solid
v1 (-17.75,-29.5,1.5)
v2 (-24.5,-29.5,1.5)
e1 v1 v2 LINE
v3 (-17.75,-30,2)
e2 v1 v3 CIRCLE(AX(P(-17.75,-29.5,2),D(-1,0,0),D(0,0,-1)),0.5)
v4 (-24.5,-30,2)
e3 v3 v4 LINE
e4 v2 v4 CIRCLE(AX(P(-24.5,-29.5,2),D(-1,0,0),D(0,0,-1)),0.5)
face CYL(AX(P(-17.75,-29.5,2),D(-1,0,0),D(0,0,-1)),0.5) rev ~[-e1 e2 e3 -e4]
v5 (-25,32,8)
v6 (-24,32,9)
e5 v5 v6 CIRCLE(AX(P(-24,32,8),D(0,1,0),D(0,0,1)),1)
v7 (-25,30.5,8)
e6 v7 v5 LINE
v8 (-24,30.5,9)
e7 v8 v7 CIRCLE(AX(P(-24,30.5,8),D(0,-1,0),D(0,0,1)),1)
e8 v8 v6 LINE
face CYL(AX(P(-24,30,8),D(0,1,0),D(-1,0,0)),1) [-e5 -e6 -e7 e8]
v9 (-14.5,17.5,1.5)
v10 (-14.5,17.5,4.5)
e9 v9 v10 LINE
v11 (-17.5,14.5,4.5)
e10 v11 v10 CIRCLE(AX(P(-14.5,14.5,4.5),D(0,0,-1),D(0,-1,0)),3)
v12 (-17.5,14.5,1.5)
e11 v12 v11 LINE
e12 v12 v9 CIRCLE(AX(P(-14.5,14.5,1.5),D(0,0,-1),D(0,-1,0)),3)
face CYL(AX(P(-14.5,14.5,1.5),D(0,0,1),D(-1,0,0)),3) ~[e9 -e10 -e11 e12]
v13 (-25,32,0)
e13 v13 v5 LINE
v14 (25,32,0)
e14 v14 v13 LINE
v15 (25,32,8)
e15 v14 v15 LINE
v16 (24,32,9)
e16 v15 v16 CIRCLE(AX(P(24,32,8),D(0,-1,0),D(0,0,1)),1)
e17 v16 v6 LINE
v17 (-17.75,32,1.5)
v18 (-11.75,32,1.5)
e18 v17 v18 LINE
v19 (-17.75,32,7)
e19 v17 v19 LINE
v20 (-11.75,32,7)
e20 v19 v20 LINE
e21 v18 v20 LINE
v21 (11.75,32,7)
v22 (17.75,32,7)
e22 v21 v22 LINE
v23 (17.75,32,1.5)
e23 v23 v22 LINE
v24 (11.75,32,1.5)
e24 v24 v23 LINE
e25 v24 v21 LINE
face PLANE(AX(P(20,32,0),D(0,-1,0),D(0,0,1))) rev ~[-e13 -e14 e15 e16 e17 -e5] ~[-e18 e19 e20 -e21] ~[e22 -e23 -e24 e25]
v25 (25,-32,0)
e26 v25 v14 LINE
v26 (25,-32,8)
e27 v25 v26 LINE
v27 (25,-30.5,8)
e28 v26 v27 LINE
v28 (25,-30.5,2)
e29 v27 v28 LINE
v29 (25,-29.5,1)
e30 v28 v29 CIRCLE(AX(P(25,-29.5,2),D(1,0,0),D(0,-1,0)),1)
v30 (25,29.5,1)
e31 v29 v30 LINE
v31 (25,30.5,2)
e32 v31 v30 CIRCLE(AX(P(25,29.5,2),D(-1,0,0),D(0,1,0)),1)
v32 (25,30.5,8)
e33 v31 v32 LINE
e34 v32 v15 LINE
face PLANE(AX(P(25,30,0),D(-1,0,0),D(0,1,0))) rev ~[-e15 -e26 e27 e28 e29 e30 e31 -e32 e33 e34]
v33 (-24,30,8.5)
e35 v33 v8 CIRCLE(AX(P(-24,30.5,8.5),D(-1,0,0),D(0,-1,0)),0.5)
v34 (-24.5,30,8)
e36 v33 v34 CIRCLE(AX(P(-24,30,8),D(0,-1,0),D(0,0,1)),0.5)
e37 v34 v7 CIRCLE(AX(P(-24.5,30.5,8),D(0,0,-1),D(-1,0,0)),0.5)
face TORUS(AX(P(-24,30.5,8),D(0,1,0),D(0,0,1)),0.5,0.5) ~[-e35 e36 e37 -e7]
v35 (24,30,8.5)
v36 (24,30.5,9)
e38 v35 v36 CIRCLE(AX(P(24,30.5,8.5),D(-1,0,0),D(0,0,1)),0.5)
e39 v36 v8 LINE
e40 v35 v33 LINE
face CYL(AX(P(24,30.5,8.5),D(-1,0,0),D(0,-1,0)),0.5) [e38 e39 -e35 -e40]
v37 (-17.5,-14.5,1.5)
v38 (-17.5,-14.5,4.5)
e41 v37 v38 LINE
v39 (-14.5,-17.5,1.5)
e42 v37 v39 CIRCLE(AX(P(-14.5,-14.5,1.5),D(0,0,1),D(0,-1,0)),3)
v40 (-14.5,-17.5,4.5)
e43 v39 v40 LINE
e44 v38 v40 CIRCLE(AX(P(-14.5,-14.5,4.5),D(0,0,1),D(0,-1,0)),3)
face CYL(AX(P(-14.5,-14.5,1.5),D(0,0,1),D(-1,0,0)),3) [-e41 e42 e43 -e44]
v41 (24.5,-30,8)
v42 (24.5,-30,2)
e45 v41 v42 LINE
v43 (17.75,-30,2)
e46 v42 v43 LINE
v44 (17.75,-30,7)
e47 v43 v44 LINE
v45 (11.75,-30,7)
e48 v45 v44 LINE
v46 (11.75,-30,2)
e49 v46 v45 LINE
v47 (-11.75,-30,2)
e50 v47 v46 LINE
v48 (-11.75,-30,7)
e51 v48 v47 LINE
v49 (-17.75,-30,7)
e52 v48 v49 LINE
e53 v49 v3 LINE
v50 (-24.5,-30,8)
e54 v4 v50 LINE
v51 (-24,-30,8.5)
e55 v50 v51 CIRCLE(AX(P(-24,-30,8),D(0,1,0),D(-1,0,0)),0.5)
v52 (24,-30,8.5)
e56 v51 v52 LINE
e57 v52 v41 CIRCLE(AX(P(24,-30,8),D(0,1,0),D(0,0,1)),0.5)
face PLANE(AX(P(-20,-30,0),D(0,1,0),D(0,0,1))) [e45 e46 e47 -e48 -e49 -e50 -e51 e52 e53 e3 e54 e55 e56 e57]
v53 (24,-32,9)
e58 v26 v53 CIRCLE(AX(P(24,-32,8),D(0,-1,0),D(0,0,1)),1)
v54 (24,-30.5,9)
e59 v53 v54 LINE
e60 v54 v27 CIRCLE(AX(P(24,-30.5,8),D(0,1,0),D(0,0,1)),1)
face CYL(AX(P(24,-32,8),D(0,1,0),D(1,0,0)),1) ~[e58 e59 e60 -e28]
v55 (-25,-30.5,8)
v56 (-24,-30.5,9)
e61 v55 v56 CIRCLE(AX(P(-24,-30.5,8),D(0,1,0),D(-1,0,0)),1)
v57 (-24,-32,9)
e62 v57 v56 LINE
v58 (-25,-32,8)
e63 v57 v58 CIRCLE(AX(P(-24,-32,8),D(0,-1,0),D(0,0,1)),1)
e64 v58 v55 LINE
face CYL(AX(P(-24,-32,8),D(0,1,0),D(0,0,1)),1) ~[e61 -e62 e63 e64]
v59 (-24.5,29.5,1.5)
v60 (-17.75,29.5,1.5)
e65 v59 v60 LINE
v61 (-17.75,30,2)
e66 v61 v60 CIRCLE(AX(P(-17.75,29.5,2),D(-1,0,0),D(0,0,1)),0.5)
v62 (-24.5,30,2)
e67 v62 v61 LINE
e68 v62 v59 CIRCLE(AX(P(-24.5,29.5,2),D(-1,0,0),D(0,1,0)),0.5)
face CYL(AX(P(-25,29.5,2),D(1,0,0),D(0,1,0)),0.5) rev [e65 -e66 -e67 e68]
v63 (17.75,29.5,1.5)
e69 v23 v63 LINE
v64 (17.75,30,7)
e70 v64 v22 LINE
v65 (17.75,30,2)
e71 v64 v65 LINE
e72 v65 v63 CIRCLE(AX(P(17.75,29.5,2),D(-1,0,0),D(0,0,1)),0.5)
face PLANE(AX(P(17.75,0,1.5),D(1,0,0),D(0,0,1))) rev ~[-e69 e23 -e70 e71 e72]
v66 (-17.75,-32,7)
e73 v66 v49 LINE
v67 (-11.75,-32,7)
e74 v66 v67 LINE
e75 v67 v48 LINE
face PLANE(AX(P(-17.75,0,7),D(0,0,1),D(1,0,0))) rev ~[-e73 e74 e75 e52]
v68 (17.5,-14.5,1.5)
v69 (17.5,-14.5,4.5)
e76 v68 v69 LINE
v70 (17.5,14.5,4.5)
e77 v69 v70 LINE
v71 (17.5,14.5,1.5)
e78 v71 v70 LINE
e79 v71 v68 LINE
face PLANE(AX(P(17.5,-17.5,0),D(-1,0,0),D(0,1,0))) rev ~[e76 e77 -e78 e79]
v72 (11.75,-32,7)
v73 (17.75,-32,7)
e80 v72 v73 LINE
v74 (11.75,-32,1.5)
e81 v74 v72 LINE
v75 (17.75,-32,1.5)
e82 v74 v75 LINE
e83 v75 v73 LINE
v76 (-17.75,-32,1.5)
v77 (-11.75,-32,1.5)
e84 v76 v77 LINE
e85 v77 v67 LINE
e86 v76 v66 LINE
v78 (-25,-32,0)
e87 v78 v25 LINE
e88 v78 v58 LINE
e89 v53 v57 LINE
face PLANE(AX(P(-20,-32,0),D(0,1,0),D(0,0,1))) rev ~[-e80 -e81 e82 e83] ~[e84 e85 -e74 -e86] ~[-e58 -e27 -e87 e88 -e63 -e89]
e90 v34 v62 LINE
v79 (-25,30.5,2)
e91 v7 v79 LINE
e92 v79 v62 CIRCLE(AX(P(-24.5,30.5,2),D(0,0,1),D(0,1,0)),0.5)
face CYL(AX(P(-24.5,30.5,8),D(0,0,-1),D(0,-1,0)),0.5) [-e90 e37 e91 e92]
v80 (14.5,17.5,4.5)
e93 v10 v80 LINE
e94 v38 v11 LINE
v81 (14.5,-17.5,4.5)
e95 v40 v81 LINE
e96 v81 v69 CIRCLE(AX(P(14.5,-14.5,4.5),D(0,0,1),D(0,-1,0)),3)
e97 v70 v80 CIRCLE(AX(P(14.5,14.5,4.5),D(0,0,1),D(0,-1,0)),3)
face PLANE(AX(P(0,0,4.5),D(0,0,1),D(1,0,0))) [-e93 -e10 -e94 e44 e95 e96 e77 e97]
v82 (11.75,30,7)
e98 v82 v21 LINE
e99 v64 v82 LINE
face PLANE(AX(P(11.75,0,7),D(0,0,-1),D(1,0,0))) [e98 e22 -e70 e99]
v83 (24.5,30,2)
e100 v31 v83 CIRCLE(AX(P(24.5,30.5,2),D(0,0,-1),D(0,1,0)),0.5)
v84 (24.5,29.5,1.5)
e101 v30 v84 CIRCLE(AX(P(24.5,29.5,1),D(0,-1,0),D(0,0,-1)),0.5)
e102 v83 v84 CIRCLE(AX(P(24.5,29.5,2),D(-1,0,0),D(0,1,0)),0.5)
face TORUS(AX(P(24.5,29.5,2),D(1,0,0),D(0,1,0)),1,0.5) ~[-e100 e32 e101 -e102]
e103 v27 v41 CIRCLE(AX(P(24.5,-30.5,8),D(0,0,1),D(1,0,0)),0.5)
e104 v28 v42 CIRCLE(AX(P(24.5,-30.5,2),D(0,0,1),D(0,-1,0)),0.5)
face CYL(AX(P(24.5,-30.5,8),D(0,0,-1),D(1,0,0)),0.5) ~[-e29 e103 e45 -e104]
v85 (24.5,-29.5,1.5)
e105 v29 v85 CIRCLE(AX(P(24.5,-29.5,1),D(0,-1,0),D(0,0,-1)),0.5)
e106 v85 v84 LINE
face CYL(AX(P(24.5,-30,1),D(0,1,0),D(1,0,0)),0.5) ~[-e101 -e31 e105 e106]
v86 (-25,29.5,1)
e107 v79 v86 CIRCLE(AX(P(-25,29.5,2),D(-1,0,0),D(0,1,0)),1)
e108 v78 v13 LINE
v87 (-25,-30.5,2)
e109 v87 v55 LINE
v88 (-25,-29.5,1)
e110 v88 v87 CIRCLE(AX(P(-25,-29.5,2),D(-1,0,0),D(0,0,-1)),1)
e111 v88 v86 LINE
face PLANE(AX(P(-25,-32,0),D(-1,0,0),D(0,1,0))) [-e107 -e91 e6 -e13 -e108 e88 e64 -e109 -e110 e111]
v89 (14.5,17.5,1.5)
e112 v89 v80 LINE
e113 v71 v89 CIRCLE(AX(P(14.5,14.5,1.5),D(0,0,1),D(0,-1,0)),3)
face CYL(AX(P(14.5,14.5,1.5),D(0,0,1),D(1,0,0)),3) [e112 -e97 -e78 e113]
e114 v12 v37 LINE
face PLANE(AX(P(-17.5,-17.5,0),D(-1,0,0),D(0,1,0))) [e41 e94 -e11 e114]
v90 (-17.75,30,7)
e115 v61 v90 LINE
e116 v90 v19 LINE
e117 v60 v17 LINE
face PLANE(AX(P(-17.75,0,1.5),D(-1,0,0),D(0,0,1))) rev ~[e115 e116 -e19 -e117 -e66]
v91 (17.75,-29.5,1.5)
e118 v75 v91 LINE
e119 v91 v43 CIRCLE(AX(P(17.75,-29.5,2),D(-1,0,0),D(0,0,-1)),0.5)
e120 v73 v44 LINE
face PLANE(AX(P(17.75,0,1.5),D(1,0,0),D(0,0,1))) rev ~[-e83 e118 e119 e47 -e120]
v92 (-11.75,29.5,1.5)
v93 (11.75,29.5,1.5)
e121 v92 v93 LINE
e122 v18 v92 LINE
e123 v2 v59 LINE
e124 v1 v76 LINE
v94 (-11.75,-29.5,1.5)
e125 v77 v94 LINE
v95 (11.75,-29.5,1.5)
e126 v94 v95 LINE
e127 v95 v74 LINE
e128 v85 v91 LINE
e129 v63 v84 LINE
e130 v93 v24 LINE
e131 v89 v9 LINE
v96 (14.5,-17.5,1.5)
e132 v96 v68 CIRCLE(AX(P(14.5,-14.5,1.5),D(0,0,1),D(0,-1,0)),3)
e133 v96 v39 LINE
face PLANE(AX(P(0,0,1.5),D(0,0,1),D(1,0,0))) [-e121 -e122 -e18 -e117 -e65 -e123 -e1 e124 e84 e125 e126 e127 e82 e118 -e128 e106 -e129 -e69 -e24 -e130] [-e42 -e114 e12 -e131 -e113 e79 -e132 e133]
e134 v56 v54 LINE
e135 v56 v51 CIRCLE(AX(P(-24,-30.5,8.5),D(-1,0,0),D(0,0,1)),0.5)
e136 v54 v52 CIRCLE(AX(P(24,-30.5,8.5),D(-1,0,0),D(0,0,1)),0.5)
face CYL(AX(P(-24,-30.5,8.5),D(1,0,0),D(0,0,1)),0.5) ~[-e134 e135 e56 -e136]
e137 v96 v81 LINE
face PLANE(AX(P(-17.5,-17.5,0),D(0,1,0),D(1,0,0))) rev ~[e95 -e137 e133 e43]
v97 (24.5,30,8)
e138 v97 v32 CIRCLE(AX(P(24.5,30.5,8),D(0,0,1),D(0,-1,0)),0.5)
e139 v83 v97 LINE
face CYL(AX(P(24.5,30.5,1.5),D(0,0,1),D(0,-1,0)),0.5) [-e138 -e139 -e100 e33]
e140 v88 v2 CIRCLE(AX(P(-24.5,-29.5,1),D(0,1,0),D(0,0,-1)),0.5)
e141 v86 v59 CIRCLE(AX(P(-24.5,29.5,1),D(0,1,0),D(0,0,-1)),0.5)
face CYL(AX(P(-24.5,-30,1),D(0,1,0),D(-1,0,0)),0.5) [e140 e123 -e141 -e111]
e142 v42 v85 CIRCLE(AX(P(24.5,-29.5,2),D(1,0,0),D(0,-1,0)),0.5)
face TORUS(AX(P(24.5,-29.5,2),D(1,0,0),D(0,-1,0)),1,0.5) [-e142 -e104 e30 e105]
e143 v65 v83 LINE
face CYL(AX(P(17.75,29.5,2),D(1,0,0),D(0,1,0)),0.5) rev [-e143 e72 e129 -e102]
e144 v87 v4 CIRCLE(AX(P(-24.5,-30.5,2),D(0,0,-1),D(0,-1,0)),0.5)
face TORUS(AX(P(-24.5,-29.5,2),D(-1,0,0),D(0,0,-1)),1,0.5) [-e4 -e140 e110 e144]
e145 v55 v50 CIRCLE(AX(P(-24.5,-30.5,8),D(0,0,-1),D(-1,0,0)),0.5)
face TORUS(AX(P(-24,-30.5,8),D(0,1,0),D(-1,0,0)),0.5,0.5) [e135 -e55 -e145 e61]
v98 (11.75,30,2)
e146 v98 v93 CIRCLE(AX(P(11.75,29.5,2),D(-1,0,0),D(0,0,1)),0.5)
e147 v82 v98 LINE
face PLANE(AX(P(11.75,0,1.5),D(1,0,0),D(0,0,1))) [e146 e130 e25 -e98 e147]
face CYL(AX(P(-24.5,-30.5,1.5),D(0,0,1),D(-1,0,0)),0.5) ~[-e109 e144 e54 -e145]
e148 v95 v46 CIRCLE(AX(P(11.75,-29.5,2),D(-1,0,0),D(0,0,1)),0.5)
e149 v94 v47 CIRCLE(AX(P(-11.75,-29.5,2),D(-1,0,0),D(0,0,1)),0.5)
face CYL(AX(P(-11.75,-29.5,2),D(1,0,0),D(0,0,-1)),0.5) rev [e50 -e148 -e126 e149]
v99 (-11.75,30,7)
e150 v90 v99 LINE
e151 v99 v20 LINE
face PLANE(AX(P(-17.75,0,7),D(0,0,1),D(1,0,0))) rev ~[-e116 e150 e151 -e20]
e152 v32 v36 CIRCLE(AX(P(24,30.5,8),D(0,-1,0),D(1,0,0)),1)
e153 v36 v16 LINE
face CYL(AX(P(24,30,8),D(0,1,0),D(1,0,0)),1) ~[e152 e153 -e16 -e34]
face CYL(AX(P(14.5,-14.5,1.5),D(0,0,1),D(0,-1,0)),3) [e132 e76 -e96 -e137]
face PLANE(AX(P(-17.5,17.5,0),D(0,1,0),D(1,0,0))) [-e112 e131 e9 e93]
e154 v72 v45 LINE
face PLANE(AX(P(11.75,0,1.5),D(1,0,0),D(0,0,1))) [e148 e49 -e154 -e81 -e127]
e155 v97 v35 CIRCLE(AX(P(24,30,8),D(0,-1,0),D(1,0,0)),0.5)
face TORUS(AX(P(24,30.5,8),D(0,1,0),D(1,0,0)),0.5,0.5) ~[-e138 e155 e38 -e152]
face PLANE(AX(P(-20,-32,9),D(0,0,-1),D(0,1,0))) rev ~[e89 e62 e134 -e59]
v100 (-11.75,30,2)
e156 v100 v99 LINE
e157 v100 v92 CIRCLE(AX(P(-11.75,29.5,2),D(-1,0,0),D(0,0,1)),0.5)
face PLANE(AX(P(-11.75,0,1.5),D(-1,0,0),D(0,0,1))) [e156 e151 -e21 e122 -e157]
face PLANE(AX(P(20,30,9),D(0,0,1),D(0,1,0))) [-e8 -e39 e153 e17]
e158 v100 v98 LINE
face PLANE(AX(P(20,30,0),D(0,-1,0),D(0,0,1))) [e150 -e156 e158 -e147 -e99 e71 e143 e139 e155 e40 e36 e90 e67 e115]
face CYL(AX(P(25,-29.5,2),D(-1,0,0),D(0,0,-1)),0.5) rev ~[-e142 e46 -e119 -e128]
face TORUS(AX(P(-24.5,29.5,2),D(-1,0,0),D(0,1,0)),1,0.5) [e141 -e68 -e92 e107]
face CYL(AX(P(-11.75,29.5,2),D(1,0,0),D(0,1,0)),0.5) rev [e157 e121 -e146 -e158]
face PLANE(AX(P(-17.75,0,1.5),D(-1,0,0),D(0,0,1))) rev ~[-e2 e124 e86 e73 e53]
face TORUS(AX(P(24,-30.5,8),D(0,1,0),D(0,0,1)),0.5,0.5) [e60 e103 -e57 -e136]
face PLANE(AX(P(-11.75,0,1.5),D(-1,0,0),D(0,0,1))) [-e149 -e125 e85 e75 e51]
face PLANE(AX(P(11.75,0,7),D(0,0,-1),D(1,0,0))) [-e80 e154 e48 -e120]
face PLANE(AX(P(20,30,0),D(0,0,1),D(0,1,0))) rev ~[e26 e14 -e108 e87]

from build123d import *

# Parameters (mm, degrees)
F0_W      = 50
F0_H      = 60
F1_DEPTH  = 1.5
F2_W      = 20
F2_H      = 2
F3_DEPTH  = 9
F4_W      = 6
F4_H      = 5.5
F5_DEPTH  = 32
F6_W      = 35
F6_H      = 35
F7_DEPTH  = 4.5
F8_R      = 3
F9_DEPTH  = 5
F10_DEPTH = 5
F11_DEPTH = 5
F12_DEPTH = 5
F13_R     = 1
F14_R     = 0.5


with BuildPart() as f1:
    # F0 (on Top) → F1 (new body)
    with BuildSketch(Plane.XY):
        Rectangle(F0_W, F0_H)
    extrude(amount=F1_DEPTH)

    # F2 (on Top) → F3 (join)
    with BuildSketch(Plane.XY):
        with Locations((10, 31)):
            Rectangle(F2_W, F2_H)
        with Locations((-10, 31)):
            Rectangle(F2_W, F2_H)
        with Locations((-10, -31)):
            Rectangle(F2_W, F2_H)
        with Locations((10, -31)):
            Rectangle(F2_W, F2_H)
    extrude(amount=F3_DEPTH)

    # F4 (on Front) → F5 (cut, symmetric)
    with BuildSketch(Plane.XZ):
        with Locations((-14.75, 4.25)):
            Rectangle(F4_W, F4_H)
        with Locations((14.75, 4.25)):
            Rectangle(F4_W, F4_H)
    extrude(amount=F5_DEPTH, both=True, mode=Mode.SUBTRACT)

    # F6 (on Top) → F7 (join)
    with BuildSketch(Plane.XY):
        Rectangle(F6_W, F6_H)
    extrude(amount=F7_DEPTH)

    # F8
    f8_edges = [f1.edges().sort_by_distance(p)[0] for p in [
        (17.5, -17.5, 3),
        (-17.5, -17.5, 3),
        (-17.5, 17.5, 3),
        (17.5, 17.5, 3),
    ]]
    fillet(f8_edges, radius=F8_R)

    # F9 (add): a face of the model
    f9_faces = [f1.faces().sort_by_distance(p)[0] for p in [
        (20, -31, 4.5),
    ]]
    extrude(f9_faces, amount=F9_DEPTH)

    # F10 (add): a face of the model
    f10_faces = [f1.faces().sort_by_distance(p)[0] for p in [
        (-20, 31, 4.5),
    ]]
    extrude(f10_faces, amount=F10_DEPTH)

    # F11 (add): a face of the model
    f11_faces = [f1.faces().sort_by_distance(p)[0] for p in [
        (-20, -31, 4.5),
    ]]
    extrude(f11_faces, amount=F11_DEPTH)

    # F12 (add): a face of the model
    f12_faces = [f1.faces().sort_by_distance(p)[0] for p in [
        (20, 31, 4.5),
    ]]
    extrude(f12_faces, amount=F12_DEPTH)

    # F13
    f13_edges = [f1.edges().sort_by_distance(p)[0] for p in [
        (25, 31, 9),
        (-25, -31, 9),
        (-25, 31, 9),
        (25, -31, 9),
    ]]
    fillet(f13_edges, radius=F13_R)

    # F14
    f14_edges = [f1.edges().sort_by_distance(p)[0] for p in [
        (-21.375, 30, 1.5),
        (21.375, 30, 1.5),
        (0, 30, 1.5),
        (-21.375, -30, 1.5),
        (0, -30, 1.5),
        (21.375, -30, 1.5),
        (0, 30, 9),
        (-24.707107, 30, 8.707107),
        (24.707107, 30, 8.707107),
        (-25, 30, 4.75),
        (-25, 0, 1.5),
        (-25, -30, 4.75),
        (25, -30, 4.75),
        (25, 0, 1.5),
        (25, 30, 4.75),
        (-24.707107, -30, 8.707107),
        (0, -30, 9),
        (24.707107, -30, 8.707107),
    ]]
    fillet(f14_edges, radius=F14_R)


solid = f1.part
